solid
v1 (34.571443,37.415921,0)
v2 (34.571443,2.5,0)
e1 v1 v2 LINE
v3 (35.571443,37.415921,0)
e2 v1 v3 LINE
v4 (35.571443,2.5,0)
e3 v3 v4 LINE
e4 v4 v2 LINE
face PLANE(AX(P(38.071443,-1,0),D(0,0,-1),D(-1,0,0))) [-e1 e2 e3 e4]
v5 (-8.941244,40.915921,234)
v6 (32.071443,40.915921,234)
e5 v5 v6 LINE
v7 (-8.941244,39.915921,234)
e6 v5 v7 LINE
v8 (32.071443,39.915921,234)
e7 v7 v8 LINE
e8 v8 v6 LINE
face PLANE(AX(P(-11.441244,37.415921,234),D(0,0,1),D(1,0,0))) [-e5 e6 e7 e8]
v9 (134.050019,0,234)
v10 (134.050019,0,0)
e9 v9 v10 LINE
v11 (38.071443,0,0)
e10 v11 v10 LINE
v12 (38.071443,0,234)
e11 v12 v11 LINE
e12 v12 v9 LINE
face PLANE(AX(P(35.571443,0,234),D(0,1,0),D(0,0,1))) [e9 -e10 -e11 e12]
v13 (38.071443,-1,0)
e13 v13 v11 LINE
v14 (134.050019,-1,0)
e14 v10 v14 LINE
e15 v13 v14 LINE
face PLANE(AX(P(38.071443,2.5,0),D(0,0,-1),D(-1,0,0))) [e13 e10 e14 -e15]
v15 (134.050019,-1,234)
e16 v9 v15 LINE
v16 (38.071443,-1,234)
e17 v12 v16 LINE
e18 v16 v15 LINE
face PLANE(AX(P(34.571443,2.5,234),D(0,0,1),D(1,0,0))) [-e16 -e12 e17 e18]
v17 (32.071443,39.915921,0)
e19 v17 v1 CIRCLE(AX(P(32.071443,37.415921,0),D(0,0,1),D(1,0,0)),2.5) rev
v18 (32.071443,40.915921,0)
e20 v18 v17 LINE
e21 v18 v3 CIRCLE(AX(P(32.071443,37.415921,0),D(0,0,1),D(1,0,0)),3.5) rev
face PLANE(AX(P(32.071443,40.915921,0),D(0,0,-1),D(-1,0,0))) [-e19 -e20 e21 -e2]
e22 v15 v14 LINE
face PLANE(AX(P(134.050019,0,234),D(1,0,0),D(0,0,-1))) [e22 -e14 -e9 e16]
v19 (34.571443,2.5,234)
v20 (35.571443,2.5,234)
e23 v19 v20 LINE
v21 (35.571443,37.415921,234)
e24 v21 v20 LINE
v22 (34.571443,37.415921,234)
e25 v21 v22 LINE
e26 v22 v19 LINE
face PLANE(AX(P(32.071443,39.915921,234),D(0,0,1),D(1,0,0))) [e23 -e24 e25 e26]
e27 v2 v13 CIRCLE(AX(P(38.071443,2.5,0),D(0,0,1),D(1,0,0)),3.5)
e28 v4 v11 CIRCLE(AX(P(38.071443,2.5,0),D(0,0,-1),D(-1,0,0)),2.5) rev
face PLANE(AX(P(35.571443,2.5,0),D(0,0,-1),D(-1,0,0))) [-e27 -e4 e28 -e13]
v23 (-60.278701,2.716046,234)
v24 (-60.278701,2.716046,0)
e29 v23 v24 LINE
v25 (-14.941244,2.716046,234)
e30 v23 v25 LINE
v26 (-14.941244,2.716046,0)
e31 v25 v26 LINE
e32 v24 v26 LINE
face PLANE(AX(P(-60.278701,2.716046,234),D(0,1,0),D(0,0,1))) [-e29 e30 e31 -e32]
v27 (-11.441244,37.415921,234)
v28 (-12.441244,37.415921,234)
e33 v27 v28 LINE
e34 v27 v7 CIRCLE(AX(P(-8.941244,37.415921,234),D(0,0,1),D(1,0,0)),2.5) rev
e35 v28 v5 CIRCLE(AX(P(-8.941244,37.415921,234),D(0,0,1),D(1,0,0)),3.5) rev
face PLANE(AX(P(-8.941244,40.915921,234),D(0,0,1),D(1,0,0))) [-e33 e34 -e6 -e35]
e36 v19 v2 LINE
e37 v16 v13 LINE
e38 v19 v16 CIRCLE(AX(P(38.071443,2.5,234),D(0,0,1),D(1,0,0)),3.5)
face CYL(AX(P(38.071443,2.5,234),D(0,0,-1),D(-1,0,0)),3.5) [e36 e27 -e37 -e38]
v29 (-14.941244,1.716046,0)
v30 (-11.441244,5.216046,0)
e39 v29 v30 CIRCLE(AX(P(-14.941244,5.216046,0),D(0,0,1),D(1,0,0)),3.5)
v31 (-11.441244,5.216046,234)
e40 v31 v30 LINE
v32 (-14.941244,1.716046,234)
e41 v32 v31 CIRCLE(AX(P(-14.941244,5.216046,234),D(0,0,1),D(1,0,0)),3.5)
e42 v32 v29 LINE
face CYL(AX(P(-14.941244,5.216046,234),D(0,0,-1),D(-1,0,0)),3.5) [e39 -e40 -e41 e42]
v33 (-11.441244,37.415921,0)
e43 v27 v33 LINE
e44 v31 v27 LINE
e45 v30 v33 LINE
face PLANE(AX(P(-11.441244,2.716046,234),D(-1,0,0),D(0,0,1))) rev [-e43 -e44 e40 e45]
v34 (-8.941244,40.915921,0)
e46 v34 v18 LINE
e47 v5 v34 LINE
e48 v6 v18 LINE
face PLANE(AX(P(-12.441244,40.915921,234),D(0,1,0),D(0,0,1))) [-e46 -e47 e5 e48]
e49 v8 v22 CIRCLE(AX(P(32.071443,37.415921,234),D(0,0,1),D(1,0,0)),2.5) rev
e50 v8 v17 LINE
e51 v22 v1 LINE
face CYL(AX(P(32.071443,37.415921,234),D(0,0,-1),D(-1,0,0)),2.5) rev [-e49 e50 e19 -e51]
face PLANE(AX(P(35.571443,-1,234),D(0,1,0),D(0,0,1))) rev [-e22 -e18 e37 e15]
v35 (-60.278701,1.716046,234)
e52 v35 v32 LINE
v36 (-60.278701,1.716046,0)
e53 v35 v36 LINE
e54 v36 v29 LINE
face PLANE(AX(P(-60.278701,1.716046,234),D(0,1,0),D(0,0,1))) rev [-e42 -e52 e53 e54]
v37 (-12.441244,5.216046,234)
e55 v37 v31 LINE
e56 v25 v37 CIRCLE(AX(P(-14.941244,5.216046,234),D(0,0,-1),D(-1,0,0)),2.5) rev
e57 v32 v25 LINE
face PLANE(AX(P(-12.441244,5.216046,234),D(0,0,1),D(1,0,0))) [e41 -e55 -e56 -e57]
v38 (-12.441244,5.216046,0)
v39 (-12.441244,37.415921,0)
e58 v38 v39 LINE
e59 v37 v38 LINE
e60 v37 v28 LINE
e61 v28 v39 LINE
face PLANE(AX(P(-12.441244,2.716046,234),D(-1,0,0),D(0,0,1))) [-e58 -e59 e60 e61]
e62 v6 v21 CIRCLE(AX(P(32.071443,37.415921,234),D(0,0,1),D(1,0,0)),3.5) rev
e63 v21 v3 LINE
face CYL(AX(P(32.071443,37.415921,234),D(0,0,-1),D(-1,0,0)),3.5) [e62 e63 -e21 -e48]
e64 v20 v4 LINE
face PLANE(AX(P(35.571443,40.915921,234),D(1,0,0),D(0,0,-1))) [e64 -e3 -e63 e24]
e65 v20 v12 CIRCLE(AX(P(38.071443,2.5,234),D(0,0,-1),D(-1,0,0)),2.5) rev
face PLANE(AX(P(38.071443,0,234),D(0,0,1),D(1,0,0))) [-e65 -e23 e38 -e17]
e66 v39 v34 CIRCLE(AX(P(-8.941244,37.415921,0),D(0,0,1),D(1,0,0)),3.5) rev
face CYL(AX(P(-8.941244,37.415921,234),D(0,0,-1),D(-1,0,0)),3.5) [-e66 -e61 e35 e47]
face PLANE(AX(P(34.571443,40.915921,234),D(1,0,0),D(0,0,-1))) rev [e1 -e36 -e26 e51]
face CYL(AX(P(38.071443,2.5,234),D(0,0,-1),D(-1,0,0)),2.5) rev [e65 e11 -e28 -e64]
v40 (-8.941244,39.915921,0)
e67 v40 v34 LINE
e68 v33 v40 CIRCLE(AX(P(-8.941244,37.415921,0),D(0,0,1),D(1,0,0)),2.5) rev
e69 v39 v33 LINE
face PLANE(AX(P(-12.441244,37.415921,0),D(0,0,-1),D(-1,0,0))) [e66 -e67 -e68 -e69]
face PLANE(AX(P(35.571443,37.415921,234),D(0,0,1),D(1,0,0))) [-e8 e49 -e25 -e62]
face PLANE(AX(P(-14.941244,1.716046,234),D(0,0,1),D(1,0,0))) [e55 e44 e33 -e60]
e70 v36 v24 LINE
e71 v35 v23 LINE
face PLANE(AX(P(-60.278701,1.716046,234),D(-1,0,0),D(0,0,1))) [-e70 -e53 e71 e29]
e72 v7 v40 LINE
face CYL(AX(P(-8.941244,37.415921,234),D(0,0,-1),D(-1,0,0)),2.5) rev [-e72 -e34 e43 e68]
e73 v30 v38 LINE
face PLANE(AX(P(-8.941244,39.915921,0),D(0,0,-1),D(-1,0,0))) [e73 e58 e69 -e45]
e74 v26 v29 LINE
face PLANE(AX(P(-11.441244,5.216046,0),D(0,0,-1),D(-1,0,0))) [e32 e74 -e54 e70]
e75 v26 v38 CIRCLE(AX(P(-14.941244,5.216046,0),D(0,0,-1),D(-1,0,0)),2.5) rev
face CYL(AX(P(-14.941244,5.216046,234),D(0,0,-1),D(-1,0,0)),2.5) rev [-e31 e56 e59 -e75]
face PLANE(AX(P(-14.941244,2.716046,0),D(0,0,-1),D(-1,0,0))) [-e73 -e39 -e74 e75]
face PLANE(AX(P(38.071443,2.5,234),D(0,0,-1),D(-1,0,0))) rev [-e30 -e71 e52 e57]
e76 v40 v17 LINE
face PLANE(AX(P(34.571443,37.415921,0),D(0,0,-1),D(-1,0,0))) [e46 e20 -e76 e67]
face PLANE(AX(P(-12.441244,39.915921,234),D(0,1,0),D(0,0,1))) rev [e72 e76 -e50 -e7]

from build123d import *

# Parameters (mm, degrees)
SM_BASE_FLANGE_1_DEPTH = 234


# Sheet-metal steps are written as plain solids
with BuildPart() as part:
    # Sketch 1 → 基体-法兰1 (new body)
    with BuildSketch(Plane.XY):
        with BuildLine():
            Line((-60.278701471, 2.716046142), (-14.941243618, 2.716046142))
            ThreePointArc((-14.941243618, 2.716046142), (-13.173476665, 3.448279189), (-12.441243618, 5.216046142))
            Line((-12.441243618, 5.216046142), (-12.441243618, 37.415920911))
            ThreePointArc((-12.441243618, 37.415920911), (-11.416117352, 39.890794646), (-8.941243618, 40.915920911))
            Line((-8.941243618, 40.915920911), (32.071443019, 40.915920911))
            ThreePointArc((32.071443019, 40.915920911), (34.546316754, 39.890794646), (35.571443019, 37.415920911))
            Line((35.571443019, 37.415920911), (35.571443019, 2.5))
            ThreePointArc((35.571443019, 2.5), (36.303676066, 0.732233047), (38.071443019, 0))
            Line((38.071443019, 0), (134.05001926, 0))
            Line((134.05001926, 0), (134.05001926, -1))
            Line((134.05001926, -1), (38.071443019, -1))
            ThreePointArc((38.071443019, -1), (35.596569285, 0.025126266), (34.571443019, 2.5))
            Line((34.571443019, 2.5), (34.571443019, 37.415920911))
            ThreePointArc((34.571443019, 37.415920911), (33.839209972, 39.183687864), (32.071443019, 39.915920911))
            Line((32.071443019, 39.915920911), (-8.941243618, 39.915920911))
            ThreePointArc((-8.941243618, 39.915920911), (-10.709010571, 39.183687864), (-11.441243618, 37.415920911))
            Line((-11.441243618, 37.415920911), (-11.441243618, 5.216046142))
            ThreePointArc((-11.441243618, 5.216046142), (-12.466369883, 2.741172408), (-14.941243618, 1.716046142))
            Line((-14.941243618, 1.716046142), (-60.278701471, 1.716046142))
            Line((-60.278701471, 1.716046142), (-60.278701471, 2.716046142))
        make_face()
    extrude(amount=SM_BASE_FLANGE_1_DEPTH)


solid = part.part
